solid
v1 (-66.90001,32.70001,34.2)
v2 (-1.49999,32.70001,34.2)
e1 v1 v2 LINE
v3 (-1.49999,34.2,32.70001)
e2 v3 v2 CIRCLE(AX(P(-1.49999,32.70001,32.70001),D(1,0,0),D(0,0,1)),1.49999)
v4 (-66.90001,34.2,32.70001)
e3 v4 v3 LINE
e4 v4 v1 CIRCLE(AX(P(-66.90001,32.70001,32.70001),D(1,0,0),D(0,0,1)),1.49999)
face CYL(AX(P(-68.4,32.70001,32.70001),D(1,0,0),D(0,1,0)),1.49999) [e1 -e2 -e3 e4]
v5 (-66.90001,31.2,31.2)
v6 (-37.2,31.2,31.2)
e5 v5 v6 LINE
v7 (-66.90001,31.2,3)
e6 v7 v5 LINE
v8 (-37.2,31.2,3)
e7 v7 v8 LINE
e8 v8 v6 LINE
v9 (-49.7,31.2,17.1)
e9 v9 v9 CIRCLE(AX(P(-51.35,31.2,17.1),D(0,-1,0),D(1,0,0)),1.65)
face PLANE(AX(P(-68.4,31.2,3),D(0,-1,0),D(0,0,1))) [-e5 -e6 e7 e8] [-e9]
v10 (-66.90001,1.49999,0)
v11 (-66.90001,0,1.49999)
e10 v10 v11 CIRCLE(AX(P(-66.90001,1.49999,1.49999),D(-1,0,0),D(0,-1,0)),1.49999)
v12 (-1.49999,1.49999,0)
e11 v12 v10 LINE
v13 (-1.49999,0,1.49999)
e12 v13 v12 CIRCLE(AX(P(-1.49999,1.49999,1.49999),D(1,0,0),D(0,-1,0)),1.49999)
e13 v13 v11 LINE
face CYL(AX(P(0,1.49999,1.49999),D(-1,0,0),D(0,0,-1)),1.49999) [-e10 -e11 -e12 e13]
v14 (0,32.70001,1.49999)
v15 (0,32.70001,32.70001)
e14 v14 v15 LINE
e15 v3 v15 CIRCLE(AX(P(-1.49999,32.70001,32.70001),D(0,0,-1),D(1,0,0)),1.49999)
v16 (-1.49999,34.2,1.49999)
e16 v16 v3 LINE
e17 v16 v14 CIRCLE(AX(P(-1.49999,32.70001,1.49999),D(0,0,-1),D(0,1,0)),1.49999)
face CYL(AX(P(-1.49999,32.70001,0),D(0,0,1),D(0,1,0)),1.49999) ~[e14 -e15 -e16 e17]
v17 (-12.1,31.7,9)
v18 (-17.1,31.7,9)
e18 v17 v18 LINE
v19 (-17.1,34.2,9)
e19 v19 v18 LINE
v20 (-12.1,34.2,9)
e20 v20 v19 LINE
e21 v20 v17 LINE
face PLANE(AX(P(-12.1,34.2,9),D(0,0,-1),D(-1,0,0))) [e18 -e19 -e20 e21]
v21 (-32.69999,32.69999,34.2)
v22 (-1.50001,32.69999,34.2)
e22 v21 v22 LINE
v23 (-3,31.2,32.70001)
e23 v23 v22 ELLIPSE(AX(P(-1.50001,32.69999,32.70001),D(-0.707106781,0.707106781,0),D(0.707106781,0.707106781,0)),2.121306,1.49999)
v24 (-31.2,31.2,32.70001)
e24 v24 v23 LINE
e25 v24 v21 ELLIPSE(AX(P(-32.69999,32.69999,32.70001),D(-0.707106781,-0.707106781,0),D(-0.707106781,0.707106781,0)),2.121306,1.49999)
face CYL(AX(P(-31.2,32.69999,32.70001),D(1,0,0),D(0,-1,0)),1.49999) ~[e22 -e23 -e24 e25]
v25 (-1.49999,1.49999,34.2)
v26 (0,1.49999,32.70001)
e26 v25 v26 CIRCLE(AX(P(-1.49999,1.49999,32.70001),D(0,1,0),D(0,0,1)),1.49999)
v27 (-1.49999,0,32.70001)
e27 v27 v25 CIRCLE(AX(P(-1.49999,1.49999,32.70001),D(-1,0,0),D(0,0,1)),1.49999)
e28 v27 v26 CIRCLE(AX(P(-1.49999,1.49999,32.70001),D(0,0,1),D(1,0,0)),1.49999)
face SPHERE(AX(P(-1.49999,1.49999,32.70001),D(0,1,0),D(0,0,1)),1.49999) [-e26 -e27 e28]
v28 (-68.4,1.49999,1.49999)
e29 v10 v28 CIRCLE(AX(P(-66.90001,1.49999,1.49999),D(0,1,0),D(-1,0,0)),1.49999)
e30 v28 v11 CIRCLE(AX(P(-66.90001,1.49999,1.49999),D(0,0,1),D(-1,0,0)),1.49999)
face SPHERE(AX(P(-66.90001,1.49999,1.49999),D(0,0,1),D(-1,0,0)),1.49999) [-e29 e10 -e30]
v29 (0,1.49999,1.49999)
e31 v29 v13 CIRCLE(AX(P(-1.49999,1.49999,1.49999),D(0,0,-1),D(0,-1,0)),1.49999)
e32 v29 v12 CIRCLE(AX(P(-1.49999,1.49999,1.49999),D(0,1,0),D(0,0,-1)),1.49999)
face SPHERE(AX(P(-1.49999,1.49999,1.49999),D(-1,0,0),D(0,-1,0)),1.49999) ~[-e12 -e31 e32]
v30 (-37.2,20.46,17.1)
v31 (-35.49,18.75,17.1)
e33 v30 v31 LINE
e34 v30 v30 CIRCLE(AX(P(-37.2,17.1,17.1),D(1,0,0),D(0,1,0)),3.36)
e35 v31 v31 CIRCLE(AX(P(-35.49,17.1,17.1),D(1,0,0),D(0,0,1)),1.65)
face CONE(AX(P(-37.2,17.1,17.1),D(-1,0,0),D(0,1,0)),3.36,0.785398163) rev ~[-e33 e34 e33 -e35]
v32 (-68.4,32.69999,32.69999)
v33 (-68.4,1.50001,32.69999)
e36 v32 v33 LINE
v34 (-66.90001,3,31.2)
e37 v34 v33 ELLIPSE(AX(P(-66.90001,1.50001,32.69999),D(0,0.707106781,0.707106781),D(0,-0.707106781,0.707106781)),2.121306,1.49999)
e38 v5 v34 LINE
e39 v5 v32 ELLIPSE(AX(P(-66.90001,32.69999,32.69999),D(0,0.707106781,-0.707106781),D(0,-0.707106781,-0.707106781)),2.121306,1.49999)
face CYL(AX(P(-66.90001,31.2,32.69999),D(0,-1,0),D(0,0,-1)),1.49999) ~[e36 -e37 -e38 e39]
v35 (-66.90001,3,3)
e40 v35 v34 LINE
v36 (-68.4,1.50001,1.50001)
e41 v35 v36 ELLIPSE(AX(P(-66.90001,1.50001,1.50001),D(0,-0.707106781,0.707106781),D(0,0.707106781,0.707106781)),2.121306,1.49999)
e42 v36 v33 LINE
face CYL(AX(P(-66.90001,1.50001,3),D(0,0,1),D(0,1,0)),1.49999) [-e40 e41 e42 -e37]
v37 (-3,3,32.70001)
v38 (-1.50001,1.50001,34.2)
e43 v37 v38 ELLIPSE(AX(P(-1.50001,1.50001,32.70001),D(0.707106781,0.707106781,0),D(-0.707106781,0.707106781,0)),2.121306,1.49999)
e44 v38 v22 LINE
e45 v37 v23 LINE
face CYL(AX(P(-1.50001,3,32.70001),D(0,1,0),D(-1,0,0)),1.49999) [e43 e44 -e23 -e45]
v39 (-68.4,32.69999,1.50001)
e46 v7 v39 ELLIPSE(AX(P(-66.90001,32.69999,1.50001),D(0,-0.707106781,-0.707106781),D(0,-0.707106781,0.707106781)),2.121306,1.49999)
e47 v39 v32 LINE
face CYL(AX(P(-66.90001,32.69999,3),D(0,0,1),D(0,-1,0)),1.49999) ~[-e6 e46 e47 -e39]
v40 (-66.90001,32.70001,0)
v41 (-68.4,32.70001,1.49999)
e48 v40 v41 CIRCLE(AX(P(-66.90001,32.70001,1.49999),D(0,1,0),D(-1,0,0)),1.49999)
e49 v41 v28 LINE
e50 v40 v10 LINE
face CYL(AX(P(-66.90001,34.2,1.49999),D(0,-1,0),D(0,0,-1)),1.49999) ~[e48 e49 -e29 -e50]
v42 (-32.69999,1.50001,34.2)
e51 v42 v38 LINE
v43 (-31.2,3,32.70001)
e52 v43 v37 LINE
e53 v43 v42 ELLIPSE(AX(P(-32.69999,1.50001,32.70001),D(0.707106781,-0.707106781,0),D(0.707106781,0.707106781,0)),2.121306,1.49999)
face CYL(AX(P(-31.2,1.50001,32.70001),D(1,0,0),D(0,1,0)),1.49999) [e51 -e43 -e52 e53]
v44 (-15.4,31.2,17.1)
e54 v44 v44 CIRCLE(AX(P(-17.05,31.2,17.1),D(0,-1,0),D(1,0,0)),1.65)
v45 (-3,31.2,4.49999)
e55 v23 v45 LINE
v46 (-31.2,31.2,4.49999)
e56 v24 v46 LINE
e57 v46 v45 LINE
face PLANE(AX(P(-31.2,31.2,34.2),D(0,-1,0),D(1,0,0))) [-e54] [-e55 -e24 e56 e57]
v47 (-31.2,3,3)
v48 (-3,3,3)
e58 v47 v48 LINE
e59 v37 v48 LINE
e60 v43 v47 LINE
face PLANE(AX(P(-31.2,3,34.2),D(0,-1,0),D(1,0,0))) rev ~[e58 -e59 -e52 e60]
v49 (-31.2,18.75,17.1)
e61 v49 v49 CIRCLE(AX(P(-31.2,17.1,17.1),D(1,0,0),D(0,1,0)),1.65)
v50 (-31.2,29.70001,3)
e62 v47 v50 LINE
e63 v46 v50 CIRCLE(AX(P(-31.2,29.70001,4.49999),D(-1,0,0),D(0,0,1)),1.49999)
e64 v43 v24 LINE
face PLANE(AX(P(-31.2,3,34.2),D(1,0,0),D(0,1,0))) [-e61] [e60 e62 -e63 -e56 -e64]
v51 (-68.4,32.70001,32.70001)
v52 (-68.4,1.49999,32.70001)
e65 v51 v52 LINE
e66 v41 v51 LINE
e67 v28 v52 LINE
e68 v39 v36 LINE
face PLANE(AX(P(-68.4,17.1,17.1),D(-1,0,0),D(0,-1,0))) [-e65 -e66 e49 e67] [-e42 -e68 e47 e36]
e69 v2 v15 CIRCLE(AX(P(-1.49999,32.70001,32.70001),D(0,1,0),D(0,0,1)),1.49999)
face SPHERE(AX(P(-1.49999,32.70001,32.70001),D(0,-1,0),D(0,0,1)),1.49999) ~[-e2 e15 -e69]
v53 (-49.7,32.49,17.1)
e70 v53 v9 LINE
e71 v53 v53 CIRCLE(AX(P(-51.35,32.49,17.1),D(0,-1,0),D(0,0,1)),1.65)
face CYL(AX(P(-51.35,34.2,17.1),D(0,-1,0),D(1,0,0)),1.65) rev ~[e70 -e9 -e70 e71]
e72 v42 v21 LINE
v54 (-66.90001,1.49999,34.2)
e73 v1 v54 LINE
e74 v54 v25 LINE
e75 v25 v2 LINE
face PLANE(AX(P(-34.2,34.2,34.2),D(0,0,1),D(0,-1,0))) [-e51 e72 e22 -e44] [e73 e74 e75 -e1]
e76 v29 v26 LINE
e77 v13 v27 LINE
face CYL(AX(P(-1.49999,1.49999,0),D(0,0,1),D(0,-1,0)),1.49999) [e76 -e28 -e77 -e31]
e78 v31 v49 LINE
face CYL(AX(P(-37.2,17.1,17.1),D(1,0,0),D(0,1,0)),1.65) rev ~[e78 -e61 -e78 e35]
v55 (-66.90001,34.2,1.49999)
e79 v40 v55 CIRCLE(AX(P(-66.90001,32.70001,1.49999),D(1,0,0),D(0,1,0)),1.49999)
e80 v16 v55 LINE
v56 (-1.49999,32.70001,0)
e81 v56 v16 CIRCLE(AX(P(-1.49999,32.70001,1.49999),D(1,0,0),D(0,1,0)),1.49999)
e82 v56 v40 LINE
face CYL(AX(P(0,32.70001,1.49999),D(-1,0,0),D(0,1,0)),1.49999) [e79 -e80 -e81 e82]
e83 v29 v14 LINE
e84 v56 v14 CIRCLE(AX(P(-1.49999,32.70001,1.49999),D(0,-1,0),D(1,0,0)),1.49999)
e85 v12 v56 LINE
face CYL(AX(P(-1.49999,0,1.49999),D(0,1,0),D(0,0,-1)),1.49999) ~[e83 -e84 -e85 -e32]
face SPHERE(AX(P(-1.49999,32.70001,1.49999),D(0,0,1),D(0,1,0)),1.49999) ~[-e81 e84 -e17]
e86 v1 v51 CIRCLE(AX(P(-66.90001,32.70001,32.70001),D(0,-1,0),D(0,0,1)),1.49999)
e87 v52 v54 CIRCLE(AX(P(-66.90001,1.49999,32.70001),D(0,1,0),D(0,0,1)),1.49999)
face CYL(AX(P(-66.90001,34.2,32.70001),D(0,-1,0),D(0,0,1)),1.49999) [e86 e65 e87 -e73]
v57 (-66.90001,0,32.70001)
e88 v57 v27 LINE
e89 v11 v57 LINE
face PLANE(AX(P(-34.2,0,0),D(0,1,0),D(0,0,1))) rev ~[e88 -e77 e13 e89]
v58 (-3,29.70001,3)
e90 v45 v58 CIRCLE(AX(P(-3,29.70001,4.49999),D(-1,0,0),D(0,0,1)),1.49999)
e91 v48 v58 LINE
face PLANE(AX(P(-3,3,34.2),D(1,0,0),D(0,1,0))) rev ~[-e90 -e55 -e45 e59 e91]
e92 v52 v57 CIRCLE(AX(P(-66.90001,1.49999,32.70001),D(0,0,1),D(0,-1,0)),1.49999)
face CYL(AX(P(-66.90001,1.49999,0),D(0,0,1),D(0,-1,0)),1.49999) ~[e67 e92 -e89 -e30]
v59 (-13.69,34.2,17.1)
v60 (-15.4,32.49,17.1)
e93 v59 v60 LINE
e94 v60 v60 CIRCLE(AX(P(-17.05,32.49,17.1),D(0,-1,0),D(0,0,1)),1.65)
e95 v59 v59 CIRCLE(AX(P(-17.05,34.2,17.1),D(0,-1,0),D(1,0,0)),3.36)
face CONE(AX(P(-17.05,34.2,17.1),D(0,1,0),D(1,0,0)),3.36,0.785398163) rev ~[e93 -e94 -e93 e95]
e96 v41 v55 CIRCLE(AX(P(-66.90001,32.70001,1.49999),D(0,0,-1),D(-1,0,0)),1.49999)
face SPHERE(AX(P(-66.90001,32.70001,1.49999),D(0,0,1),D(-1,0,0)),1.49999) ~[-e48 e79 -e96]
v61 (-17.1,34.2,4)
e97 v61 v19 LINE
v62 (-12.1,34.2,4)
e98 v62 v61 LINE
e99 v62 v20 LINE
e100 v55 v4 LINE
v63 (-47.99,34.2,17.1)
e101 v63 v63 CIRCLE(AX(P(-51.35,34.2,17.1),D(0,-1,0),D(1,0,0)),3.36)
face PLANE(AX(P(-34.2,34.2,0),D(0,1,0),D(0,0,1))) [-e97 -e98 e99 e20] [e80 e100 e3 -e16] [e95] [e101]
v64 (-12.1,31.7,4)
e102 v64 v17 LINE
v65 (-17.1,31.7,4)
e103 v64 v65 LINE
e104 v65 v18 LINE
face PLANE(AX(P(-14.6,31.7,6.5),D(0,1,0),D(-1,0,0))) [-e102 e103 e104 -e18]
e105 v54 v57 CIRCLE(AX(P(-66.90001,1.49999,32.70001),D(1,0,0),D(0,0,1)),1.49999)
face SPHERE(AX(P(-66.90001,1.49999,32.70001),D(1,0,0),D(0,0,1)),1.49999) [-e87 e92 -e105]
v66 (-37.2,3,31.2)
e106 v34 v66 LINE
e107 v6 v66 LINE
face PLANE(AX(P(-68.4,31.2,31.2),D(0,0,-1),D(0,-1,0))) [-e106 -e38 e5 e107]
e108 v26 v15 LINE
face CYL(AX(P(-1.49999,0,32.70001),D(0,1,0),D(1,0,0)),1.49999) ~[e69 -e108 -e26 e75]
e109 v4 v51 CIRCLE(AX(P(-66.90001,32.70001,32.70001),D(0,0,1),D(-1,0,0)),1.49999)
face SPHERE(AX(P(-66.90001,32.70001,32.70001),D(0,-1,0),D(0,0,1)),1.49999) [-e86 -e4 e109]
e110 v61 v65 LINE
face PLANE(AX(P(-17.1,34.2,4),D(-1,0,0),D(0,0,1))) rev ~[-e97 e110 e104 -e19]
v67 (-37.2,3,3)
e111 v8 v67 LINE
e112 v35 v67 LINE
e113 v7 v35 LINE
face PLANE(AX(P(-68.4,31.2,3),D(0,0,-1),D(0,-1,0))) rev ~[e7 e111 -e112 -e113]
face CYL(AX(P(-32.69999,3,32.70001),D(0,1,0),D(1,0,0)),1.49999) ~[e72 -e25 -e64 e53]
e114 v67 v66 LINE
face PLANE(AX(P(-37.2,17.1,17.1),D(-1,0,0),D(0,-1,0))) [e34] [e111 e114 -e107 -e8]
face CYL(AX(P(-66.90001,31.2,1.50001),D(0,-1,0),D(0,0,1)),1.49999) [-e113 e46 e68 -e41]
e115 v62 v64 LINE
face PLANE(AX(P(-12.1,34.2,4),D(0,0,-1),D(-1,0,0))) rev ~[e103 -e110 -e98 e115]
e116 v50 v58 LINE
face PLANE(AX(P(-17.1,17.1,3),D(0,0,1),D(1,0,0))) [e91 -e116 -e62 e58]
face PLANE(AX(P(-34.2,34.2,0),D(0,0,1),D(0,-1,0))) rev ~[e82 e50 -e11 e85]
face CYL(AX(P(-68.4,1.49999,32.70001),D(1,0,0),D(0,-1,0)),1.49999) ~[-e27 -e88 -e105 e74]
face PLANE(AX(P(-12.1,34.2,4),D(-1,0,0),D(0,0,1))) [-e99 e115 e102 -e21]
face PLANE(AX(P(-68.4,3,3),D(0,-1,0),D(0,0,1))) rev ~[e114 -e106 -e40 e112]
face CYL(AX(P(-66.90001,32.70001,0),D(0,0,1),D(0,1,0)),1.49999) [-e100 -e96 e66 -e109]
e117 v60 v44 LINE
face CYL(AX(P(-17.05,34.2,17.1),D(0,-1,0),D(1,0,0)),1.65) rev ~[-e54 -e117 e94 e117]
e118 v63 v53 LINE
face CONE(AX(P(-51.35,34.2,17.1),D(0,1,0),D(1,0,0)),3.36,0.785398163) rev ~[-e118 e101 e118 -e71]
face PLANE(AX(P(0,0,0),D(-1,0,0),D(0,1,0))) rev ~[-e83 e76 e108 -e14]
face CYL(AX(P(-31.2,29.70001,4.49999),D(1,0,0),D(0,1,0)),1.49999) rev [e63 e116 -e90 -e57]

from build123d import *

# Parameters (mm, degrees)
F1_DEPTH              = 34.2
F2_W                  = 28.2
F2_H                  = 28.2
F3_DEPTH              = 31.2
F4_W                  = 34.2
F4_H                  = 34.2
F5_DEPTH              = 34.2
F6_W                  = 28.2
F6_H                  = 28.2
F7_DEPTH              = 31.2
F10_D                 = 3.3
F10_DEPTH             = 25
F10_CSINK_D           = 6.72
F10_CSINK_ANGLE       = 90
F10_TIP               = 0.9914200214
F10_ON_F9_D           = 3.3
F10_ON_F9_DEPTH       = 25
F10_ON_F9_CSINK_D     = 6.72
F10_ON_F9_CSINK_ANGLE = 90
F10_ON_F9_TIP         = 0.9914200214
F11_R                 = 1.49999
F12_W                 = 5
F12_H                 = 5
F13_DEPTH             = 2.5


# Not quite as in the source:
# - a fillet or chamfer is up to 0.001 mm smaller than in the source, because OpenCascade refuses the exact size
# - a feature names something its author has since deleted; it is built from what else it names


with BuildPart() as f1:
    # F0 (on Top) → F1 (new body)
    with BuildSketch(Plane.XY):
        Polygon((-34.2, 0), (-8, 0), (0, 0), (0, 34.2), (-34.2, 34.2), align=None)
    extrude(amount=F1_DEPTH)

    # F2 (on face) → F3 (cut)
    with BuildSketch(Plane.XY.offset(34.2)):
        with Locations((-17.1, 17.1)):
            Rectangle(F2_W, F2_H)
    extrude(amount=-F3_DEPTH, mode=Mode.SUBTRACT)

    # F4 (on face) → F5 (join)
    with BuildSketch(Plane(origin=(-34.2, 0, 0), x_dir=(0, -1, 0), z_dir=(-1, 0, 0))):
        with Locations((-17.1, 17.1)):
            Rectangle(F4_W, F4_H)
    extrude(amount=F5_DEPTH)

    # F6 (on face) → F7 (cut)
    with BuildSketch(Plane(origin=(-68.4, 0, 0), x_dir=(0, -1, 0), z_dir=(-1, 0, 0))):
        with Locations((-17.1, 17.1)):
            Rectangle(F6_W, F6_H)
    extrude(amount=-F7_DEPTH, mode=Mode.SUBTRACT)

    # F10
    with Locations(Plane(origin=(0, 34.2, 0), x_dir=(-1, 0, 0), z_dir=(0, 1, 0))):
        with Locations((17.05, 17.1), (51.35, 17.1)):
            CounterSinkHole(F10_D / 2, F10_CSINK_D / 2, depth=F10_DEPTH, counter_sink_angle=F10_CSINK_ANGLE)
            with Locations((0, 0, -(F10_DEPTH + F10_TIP / 2))):  # 118° drill point
                Cone(0, F10_D / 2, F10_TIP, mode=Mode.SUBTRACT)

    # F10 on F9
    with Locations(Plane(origin=(-37.2, 0, 0), x_dir=(0, -1, 0), z_dir=(-1, 0, 0))):
        with Locations((-17.1, 17.1)):
            CounterSinkHole(F10_ON_F9_D / 2, F10_ON_F9_CSINK_D / 2, depth=F10_ON_F9_DEPTH, counter_sink_angle=F10_ON_F9_CSINK_ANGLE)
            with Locations((0, 0, -(F10_ON_F9_DEPTH + F10_ON_F9_TIP / 2))):  # 118° drill point
                Cone(0, F10_ON_F9_D / 2, F10_ON_F9_TIP, mode=Mode.SUBTRACT)

    # F11 (radius 1.5 in the source; OpenCascade refuses exactly that, so slightly less here)
    f11_edges = [f1.edges().sort_by_distance(p)[0] for p in [
        (-31.2, 17.1, 34.2),
        (-17.1, 31.2, 34.2),
        (-17.1, 31.2, 3),
        (0, 17.1, 34.2),
        (-34.2, 0, 34.2),
        (-68.4, 17.1, 34.2),
        (-34.2, 34.2, 34.2),
        (0, 34.2, 17.1),
        (-68.4, 17.1, 31.2),
        (-68.4, 0, 17.1),
        (-68.4, 3, 17.1),
        (-68.4, 31.2, 17.1),
        (-68.4, 34.2, 17.1),
        (-68.4, 17.1, 3),
        (-68.4, 17.1, 0),
        (-34.2, 0, 0),
        (-34.2, 34.2, 0),
        (0, 0, 17.1),
        (-3, 17.1, 34.2),
        (-17.1, 3, 34.2),
        (0, 17.1, 0),
    ]]
    fillet(f11_edges, radius=F11_R)

    # F12 (on face) → F13 (cut)
    with BuildSketch(Plane(origin=(0, 34.2, 0), x_dir=(-1, 0, 0), z_dir=(0, 1, 0))):
        with Locations((14.6, 6.5)):
            Rectangle(F12_W, F12_H)
    extrude(amount=-F13_DEPTH, mode=Mode.SUBTRACT)


solid = f1.part
